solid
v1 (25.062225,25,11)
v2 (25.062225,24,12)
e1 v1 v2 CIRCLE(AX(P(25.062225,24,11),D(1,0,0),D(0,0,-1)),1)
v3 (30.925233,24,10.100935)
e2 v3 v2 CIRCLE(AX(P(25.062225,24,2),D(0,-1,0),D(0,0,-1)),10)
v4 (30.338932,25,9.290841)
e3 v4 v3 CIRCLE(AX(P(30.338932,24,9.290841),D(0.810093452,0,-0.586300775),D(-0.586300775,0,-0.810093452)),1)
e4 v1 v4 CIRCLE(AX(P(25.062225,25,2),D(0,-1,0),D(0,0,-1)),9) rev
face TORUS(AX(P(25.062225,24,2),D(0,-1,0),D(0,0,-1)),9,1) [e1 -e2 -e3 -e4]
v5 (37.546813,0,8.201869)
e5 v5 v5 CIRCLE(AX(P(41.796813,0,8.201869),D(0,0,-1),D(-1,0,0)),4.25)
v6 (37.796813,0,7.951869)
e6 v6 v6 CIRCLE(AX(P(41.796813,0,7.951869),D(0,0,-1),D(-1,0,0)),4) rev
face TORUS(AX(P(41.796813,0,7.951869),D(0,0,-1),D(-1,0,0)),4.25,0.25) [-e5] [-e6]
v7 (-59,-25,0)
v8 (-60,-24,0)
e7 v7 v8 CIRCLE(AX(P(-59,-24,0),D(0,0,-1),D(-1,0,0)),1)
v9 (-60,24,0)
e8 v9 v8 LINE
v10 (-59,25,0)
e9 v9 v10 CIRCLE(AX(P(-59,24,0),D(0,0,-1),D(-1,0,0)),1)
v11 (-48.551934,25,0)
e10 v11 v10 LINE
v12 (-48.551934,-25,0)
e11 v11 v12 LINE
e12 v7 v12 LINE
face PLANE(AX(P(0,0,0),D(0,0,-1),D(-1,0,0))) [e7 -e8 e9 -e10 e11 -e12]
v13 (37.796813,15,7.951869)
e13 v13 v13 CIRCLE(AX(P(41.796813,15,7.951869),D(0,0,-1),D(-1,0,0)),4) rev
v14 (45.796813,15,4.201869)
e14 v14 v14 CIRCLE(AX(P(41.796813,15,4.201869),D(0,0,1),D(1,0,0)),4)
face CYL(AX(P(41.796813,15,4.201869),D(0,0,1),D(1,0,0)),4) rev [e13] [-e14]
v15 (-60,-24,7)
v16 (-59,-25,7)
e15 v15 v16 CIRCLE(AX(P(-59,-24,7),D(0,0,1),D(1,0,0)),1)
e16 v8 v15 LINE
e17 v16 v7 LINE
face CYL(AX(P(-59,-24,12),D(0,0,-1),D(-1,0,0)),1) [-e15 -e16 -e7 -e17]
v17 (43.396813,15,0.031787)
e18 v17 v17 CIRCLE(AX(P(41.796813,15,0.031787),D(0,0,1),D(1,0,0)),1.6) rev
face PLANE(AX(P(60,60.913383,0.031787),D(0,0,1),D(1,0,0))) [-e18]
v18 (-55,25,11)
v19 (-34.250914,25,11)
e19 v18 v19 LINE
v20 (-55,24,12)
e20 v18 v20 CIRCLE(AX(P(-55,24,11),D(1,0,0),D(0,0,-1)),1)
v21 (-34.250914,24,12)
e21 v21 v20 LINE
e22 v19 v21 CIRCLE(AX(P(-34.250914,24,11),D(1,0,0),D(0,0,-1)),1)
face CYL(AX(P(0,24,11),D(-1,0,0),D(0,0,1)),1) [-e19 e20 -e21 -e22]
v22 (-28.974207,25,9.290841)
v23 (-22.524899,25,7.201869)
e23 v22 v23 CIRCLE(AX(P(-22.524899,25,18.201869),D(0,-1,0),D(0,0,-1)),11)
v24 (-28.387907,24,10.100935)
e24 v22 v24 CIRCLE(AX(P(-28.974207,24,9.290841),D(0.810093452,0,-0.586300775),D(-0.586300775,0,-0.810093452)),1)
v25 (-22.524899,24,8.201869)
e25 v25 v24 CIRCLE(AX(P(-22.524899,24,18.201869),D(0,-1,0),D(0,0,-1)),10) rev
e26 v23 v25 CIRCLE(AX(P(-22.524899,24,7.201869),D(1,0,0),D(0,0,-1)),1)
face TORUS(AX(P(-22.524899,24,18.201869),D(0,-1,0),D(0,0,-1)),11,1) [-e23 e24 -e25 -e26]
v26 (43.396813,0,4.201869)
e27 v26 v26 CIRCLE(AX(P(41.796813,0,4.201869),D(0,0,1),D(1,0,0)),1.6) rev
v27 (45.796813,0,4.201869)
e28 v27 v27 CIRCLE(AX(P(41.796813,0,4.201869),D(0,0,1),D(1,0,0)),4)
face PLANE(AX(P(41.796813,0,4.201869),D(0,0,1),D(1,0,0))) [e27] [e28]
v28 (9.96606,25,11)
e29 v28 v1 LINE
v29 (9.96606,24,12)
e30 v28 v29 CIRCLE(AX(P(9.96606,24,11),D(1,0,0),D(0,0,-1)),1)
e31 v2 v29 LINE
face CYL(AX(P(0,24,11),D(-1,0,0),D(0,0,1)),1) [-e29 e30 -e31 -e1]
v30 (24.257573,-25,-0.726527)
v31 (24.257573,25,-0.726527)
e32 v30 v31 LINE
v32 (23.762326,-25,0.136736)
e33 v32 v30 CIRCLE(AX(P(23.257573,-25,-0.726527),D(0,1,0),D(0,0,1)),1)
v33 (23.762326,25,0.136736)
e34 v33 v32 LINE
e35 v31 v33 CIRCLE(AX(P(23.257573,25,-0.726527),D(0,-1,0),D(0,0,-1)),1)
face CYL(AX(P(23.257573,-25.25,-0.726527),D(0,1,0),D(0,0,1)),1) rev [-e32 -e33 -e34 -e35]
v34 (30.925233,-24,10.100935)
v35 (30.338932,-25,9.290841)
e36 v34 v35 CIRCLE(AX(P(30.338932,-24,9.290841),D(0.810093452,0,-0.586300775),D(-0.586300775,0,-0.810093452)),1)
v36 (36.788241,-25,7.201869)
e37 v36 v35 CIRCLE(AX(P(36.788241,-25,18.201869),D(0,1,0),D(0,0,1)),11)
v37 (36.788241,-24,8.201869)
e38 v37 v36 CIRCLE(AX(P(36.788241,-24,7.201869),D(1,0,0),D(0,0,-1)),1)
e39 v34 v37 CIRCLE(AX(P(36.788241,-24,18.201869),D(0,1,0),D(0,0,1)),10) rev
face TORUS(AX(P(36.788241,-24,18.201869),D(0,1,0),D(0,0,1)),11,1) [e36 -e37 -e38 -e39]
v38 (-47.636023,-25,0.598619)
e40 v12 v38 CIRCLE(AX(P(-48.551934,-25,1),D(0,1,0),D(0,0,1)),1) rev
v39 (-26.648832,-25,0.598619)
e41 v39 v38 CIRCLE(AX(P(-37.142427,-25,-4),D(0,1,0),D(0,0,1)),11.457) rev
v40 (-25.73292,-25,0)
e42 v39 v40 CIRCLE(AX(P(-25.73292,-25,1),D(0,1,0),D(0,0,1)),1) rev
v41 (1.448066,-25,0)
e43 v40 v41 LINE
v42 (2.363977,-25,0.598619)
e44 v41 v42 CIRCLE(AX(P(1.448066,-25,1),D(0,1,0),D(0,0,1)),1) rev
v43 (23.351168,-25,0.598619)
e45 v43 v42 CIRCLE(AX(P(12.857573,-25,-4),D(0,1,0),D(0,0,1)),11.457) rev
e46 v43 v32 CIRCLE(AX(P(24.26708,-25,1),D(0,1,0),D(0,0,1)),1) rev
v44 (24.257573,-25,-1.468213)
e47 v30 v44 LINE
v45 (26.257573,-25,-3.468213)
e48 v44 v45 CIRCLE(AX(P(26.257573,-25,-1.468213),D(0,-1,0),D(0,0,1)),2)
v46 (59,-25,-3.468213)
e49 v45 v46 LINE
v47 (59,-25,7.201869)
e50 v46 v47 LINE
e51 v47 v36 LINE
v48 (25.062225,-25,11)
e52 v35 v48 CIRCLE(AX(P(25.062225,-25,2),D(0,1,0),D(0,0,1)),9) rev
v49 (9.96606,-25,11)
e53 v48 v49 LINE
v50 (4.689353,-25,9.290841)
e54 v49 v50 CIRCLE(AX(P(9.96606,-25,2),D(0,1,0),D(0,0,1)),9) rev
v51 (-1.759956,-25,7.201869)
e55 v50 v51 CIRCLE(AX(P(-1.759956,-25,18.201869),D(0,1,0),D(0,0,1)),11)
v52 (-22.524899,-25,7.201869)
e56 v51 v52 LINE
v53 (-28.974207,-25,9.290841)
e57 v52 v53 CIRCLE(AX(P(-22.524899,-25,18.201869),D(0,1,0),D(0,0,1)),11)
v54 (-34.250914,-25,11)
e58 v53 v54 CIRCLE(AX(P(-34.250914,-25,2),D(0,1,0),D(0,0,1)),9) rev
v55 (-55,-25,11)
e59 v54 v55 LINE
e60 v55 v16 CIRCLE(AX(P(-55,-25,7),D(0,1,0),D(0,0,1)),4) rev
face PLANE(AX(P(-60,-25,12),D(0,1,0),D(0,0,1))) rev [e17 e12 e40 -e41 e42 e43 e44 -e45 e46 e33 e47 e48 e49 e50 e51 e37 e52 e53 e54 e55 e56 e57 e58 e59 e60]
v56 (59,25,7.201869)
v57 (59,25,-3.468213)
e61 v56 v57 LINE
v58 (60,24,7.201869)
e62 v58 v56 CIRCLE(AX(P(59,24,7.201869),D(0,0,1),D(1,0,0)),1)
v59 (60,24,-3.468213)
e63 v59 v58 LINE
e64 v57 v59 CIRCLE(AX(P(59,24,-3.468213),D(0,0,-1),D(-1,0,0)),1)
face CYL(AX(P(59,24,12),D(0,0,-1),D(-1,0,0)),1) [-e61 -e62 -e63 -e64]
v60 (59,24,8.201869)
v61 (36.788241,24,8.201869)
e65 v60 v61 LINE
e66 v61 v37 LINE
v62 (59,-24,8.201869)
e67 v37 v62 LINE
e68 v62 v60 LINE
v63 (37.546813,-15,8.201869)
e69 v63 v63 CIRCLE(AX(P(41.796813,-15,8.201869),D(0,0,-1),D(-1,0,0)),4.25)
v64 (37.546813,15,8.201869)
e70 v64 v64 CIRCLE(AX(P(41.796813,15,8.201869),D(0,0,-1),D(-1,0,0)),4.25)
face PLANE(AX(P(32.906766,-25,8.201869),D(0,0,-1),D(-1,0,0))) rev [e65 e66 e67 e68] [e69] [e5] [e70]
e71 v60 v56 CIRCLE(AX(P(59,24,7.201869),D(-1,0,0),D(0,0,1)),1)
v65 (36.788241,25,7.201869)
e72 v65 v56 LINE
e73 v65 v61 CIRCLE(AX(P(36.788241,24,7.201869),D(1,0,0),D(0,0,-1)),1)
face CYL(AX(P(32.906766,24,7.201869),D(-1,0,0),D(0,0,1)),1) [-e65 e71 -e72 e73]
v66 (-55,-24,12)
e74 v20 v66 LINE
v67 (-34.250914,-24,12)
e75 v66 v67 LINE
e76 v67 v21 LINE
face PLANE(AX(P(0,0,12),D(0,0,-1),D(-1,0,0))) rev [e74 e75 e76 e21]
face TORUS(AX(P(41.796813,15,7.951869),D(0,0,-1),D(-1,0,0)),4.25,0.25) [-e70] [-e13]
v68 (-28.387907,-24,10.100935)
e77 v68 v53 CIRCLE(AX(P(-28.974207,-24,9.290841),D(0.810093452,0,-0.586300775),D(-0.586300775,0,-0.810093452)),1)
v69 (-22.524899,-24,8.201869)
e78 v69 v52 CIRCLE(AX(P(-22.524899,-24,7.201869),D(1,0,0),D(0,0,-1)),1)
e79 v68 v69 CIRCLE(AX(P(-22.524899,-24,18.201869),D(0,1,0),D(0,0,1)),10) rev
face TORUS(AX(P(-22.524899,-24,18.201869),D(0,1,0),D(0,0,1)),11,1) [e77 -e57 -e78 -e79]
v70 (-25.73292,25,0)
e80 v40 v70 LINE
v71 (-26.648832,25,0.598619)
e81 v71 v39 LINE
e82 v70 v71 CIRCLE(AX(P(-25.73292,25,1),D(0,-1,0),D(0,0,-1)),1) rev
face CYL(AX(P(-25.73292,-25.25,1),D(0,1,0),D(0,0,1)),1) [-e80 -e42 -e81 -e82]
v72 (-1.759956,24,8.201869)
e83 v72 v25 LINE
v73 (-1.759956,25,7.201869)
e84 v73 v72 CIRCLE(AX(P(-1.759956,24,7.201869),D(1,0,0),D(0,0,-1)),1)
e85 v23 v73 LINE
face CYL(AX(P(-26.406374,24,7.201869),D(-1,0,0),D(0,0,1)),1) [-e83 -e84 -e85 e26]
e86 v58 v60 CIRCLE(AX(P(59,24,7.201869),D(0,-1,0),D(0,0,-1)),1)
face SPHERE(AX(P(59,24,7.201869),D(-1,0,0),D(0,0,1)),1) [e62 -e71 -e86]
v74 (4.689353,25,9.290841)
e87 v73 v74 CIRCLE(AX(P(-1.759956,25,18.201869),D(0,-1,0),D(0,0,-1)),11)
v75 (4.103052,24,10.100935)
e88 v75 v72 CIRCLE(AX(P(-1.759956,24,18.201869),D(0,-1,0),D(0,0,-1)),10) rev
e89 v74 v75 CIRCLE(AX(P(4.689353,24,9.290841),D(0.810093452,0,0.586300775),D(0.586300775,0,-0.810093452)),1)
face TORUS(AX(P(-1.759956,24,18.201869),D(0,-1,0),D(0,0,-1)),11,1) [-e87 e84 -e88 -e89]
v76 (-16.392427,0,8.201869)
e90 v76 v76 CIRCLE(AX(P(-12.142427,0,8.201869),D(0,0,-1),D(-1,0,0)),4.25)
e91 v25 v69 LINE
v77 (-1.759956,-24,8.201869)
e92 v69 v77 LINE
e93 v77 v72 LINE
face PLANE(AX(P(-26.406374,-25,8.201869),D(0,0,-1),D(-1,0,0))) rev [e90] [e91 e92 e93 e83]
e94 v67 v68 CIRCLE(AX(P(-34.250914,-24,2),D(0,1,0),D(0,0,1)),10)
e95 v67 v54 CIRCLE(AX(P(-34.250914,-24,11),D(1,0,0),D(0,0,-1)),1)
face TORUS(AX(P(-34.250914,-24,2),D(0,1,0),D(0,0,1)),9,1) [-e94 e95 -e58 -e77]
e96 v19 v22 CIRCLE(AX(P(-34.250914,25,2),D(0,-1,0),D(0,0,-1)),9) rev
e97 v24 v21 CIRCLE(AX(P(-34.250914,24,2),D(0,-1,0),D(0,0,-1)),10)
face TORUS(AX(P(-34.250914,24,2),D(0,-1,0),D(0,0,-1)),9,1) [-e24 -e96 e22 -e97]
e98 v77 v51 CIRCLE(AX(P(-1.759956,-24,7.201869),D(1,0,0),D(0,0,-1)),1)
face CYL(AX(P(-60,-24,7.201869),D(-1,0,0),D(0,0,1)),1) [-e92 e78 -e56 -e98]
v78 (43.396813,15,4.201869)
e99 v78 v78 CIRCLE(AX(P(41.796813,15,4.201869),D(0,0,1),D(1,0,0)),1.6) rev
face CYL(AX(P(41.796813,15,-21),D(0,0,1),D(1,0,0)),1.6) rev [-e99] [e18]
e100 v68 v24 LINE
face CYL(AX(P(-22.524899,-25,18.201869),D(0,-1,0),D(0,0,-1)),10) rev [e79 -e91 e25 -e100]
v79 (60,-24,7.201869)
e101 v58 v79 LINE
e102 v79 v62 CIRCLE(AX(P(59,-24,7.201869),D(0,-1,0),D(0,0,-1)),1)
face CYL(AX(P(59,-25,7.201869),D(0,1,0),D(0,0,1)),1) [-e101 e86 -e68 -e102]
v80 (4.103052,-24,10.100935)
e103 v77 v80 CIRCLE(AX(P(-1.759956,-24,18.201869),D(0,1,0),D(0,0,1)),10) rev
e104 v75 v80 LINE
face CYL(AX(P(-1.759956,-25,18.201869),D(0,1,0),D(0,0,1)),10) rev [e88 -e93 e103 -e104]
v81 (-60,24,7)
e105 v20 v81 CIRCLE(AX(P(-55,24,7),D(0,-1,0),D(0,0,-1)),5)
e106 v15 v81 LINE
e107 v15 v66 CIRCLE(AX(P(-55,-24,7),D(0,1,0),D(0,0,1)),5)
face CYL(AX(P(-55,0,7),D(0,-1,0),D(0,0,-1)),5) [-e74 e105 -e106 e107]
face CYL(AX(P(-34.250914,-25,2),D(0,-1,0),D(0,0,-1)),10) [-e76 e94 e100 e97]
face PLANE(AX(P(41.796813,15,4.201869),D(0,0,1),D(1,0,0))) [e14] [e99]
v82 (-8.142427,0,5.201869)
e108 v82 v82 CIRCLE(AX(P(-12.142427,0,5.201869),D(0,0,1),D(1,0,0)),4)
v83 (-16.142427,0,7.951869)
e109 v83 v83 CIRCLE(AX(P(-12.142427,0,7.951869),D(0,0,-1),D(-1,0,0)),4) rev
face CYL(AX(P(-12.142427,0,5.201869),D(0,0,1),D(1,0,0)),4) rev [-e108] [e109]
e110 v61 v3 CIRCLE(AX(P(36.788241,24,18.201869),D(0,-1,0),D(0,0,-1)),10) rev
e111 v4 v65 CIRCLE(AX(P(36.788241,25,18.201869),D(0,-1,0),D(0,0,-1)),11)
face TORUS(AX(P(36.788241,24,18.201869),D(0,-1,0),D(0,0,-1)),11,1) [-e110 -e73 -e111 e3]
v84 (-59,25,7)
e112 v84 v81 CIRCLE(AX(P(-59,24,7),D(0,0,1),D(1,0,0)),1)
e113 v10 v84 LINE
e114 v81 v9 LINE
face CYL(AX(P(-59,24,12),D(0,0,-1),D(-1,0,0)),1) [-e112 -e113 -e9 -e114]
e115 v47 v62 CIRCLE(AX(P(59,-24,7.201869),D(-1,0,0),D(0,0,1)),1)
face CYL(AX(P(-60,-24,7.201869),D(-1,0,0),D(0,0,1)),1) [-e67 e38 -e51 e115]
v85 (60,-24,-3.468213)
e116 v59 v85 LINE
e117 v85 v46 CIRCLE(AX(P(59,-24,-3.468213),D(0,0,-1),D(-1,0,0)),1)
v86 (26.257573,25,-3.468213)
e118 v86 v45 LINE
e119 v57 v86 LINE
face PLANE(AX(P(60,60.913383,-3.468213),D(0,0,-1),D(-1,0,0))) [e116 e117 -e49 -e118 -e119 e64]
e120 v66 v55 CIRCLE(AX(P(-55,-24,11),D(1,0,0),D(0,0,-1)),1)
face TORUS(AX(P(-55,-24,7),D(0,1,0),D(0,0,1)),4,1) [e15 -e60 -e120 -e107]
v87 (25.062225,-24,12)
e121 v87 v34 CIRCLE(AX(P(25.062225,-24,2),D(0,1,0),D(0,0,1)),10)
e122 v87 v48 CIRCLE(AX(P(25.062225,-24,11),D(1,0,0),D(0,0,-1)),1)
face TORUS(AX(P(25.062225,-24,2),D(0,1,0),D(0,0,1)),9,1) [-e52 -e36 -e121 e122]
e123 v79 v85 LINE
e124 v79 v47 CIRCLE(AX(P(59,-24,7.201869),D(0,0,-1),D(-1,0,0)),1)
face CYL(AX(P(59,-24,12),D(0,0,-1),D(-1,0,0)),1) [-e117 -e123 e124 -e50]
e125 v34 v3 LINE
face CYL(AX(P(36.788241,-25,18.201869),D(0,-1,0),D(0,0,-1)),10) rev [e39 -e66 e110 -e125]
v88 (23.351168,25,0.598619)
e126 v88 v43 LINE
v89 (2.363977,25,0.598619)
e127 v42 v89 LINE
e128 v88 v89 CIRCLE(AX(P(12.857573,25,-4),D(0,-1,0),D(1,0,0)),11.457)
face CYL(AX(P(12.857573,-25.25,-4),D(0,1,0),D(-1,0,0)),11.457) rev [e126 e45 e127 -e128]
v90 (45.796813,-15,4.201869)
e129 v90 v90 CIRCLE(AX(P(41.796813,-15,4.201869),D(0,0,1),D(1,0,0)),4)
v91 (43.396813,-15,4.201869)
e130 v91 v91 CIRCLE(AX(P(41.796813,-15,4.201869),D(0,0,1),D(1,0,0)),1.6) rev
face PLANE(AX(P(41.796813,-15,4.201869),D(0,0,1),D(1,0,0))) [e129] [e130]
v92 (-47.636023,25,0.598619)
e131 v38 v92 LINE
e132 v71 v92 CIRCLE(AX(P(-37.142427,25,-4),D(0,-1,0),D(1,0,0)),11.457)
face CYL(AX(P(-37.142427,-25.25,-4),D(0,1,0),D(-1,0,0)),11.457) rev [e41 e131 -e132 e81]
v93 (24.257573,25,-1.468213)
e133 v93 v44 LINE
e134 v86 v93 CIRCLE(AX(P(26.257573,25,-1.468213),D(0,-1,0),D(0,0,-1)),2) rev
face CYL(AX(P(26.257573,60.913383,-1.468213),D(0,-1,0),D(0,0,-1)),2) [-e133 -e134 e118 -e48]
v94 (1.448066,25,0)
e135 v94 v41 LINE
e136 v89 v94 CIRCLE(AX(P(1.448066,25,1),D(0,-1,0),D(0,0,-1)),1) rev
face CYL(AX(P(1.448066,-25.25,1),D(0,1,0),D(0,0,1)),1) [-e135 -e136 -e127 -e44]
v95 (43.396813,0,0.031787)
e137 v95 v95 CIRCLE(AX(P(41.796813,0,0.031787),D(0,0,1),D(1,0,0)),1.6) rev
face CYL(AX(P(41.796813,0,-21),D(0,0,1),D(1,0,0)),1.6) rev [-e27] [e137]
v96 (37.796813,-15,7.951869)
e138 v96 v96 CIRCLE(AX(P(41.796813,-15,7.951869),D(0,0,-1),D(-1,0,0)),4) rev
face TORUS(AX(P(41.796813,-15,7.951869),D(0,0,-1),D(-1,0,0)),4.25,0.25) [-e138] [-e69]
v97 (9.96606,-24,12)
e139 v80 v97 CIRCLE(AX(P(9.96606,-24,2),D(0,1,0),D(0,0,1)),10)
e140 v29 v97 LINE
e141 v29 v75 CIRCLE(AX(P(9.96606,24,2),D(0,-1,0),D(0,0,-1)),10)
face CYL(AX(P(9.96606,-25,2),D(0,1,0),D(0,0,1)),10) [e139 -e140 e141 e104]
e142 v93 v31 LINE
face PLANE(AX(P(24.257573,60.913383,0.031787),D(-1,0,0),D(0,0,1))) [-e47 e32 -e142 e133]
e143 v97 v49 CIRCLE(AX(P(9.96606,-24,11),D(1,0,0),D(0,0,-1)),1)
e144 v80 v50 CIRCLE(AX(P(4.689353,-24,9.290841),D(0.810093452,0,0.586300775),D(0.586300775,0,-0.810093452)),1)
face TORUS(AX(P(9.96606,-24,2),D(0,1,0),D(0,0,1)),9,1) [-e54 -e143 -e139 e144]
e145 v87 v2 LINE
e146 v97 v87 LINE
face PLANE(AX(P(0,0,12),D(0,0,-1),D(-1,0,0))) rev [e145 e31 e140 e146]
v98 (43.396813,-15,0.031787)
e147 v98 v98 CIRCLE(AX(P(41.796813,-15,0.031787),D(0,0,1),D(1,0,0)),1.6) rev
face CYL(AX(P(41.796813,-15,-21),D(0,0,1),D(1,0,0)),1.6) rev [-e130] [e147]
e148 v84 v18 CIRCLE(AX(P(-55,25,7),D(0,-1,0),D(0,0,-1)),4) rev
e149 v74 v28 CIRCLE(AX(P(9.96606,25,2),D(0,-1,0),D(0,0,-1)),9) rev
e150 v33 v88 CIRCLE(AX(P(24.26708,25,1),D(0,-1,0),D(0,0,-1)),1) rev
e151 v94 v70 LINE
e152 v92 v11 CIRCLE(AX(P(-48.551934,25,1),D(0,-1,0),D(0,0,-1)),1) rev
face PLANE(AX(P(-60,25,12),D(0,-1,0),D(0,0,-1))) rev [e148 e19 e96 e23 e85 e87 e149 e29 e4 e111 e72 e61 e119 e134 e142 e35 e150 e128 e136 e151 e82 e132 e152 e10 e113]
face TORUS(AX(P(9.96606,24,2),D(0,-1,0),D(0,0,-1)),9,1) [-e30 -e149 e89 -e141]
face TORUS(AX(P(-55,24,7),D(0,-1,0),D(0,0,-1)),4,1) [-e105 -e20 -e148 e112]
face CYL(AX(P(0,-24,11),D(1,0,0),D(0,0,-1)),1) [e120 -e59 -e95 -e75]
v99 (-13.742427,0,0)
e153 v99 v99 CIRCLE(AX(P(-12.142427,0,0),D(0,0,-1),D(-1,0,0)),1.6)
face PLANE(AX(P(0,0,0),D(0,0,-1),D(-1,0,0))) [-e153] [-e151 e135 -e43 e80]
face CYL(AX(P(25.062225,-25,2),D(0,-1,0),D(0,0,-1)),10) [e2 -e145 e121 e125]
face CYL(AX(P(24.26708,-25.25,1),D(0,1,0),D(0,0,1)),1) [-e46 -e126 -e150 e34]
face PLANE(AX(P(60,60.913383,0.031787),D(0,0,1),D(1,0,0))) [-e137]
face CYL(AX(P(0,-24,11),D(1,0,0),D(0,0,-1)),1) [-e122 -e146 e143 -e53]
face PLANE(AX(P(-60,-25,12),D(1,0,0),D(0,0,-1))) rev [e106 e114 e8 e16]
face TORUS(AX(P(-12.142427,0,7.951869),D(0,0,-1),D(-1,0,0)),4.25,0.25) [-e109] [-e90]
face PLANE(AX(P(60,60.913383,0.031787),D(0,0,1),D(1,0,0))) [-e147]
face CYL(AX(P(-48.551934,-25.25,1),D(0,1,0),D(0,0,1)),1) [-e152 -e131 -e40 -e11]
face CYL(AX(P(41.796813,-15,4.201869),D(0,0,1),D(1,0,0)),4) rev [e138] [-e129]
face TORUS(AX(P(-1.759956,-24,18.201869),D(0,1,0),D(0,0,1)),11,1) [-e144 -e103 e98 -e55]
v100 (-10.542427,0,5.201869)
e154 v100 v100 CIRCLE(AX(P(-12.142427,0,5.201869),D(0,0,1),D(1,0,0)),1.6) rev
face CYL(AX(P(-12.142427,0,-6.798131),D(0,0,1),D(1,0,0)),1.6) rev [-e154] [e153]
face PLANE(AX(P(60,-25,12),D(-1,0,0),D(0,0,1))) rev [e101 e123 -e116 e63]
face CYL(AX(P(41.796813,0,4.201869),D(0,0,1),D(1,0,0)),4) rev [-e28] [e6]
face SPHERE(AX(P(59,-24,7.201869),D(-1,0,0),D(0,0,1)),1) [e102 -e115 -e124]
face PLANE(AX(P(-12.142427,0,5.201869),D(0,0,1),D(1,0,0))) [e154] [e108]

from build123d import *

# Parameters (mm, degrees)
ESQUISSE1_W             = 120
ESQUISSE1_H             = 50
BOSS_EXTRU_1_DEPTH      = 12
EMPREINTE1_START        = -25
EMPREINTE1_DEPTH        = 50
ESQUISSE3_W             = 28.527892604
ESQUISSE3_H             = 3.798130957
ENL_V_MAT_EXTRU_4_DEPTH = 80.018985061
CONG_2_R                = 10
CONG_3_R                = 10
ESQUISSE4_R             = 1.6
ENL_V_MAT_EXTRU_5_DEPTH = 15
ESQUISSE5_R             = 4
ENL_V_MAT_EXTRU_6_DEPTH = 3
CONG_4_R                = 0.25
CONG_5_R                = 5
ESQUISSE7_R             = 1.6
ENL_V_MAT_EXTRU_7_DEPTH = 33
ESQUISSE8_W             = 27.093233952
ESQUISSE8_H             = 3.798130957
ENL_V_MAT_EXTRU_8_DEPTH = 80.018985061
CONG_6_R                = 10
CONG_7_R                = 10
ESQUISSE9_R             = 4
ENL_V_MAT_EXTRU_9_DEPTH = 4
CONG_8_R                = 0.25
CONG_9_R                = 1
CONG_10_R               = 1
BOSS_EXTRU_2_DEPTH      = 50
CONG_11_R               = 1
CONG_12_R               = 1


# Read off the part's stored shape, not the designer's step: Empreinte1
with BuildPart() as part:
    # Esquisse1 → Boss.-Extru.1 (new body)
    with BuildSketch(Plane.XY):
        Rectangle(ESQUISSE1_W, ESQUISSE1_H)
    extrude(amount=BOSS_EXTRU_1_DEPTH)

    # Empreinte1 outline → Empreinte1 (cut)
    with BuildSketch(Plane(origin=(0, 0, 0), x_dir=(1, 0, 0), z_dir=(0, 1, 0)).offset(EMPREINTE1_START)):
        with BuildLine():
            Line((-26.406373523, 0), (-47.878480919, 0))
            ThreePointArc((-47.878480919, 0), (-37.142427221, -7.457), (-26.406373523, 0))
        make_face()
        with BuildLine():
            Line((23.593626477, 0), (2.121519081, 0))
            ThreePointArc((2.121519081, 0), (12.857572779, -7.457), (23.593626477, 0))
        make_face()
    extrude(amount=EMPREINTE1_DEPTH, mode=Mode.SUBTRACT)

    # Esquisse3 → Enlèv. mat.-Extru.4 (cut, through all)
    with BuildSketch(Plane(origin=(0, 25, 0), x_dir=(1, 0, 0), z_dir=(0, 1, 0))):
        with Locations((-12.142427221, -10.100934522)):
            Rectangle(ESQUISSE3_W, ESQUISSE3_H)
    extrude(amount=-ENL_V_MAT_EXTRU_4_DEPTH, mode=Mode.SUBTRACT)

    # Congé2
    # the kernel refuses this fillet: 10 mm, written as the material it takes off along each edge
    with BuildSketch(Plane(origin=(-26.406373523, 44.611352002, 12), x_dir=(0, 0, -1), z_dir=(0, -1, 0))) as cong_2_piece_1:
        with BuildLine():
            CenterArc((10, -7.844540801), CONG_2_R, 128.329784501, 51.670215499)
            Line((0, -7.844540801), (-0.2, -7.844540801))
            Line((-0.2, -7.844540801), (-0.2, 0))
            Line((-0.2, 0), (0, 0.2))
            ThreePointArc((0, 0.2), (1.899065478, 0.2), (3.674093576, 0.156890816))
            Line((3.674093576, 0.156890816), (3.798130957, 0))
        make_face()
    extrude(amount=89.222704003, mode=Mode.SUBTRACT)
    with BuildSketch(Plane(origin=(2.121519081, 44.611352002, 12), x_dir=(1, 0, 0), z_dir=(0, -1, 0))) as cong_2_piece_2:
        with BuildLine():
            CenterArc((7.844540801, -10), CONG_2_R, 90, 51.670215499)
            Line((0, -3.798130957), (-0.156890816, -3.674093576))
            ThreePointArc((-0.156890816, -3.674093576), (-0.2, -1.899065478), (-0.2, 0))
            Line((-0.2, 0), (0, 0.2))
            Line((0, 0.2), (7.844540801, 0.2))
            Line((7.844540801, 0.2), (7.844540801, 0))
        make_face()
    extrude(amount=89.222704003, mode=Mode.SUBTRACT)

    # Congé3
    cong_3_edges = [part.edges().sort_by_distance(p)[0] for p in [
        (2.121519081, 0, 8.201869043),
        (-26.406373523, 0, 8.201869043),
    ]]
    fillet(cong_3_edges, radius=CONG_3_R)

    # Esquisse4 → Enlèv. mat.-Extru.5 (cut)
    with BuildSketch(Plane.XY.offset(8.201869043)):
        with Locations((-12.142427221, 0)):
            Circle(ESQUISSE4_R)
    extrude(amount=-ENL_V_MAT_EXTRU_5_DEPTH, mode=Mode.SUBTRACT)

    # Esquisse5 → Enlèv. mat.-Extru.6 (cut)
    with BuildSketch(Plane.XY.offset(8.201869043)):
        with Locations((-12.142427221, 0)):
            Circle(ESQUISSE5_R)
    extrude(amount=-ENL_V_MAT_EXTRU_6_DEPTH, mode=Mode.SUBTRACT)

    # Congé4
    cong_4_edges = [part.edges().sort_by_distance(p)[0] for p in [
        (-16.142427221, 0, 8.201869043),
    ]]
    fillet(cong_4_edges, radius=CONG_4_R)

    # Congé5
    cong_5_edges = [part.edges().sort_by_distance(p)[0] for p in [
        (-60, 0, 12),
    ]]
    fillet(cong_5_edges, radius=CONG_5_R)

    # Esquisse7 → Enlèv. mat.-Extru.7 (cut)
    with BuildSketch(Plane.XY.offset(12)):
        with Locations((41.796813238, 0)):
            Circle(ESQUISSE7_R)
        with Locations((41.796813238, 15)):
            Circle(ESQUISSE7_R)
        with Locations((41.796813238, -15)):
            Circle(ESQUISSE7_R)
    extrude(amount=-ENL_V_MAT_EXTRU_7_DEPTH, mode=Mode.SUBTRACT)

    # Esquisse8 → Enlèv. mat.-Extru.8 (cut, through all)
    with BuildSketch(Plane(origin=(0, 25, 0), x_dir=(1, 0, 0), z_dir=(0, 1, 0))):
        with Locations((46.453383024, -10.100934522)):
            Rectangle(ESQUISSE8_W, ESQUISSE8_H)
    extrude(amount=-ENL_V_MAT_EXTRU_8_DEPTH, mode=Mode.SUBTRACT)

    # Congé6
    # the kernel refuses this fillet: 10 mm, written as the material it takes off along each edge
    with BuildSketch(Plane(origin=(32.906766048, 44.611352002, 12), x_dir=(-1, 0, 0), z_dir=(0, -1, 0))) as cong_6_piece_1:
        with BuildLine():
            CenterArc((7.844540801, 10), CONG_6_R, 218.329784501, 51.670215499)
            Line((0, 3.798130957), (-0.156890816, 3.674093576))
            ThreePointArc((-0.156890816, 3.674093576), (-0.2, 1.899065478), (-0.2, 0))
            Line((-0.2, 0), (0, -0.2))
            Line((0, -0.2), (7.844540801, -0.2))
            Line((7.844540801, -0.2), (7.844540801, 0))
        make_face()
    extrude(amount=89.222704003, mode=Mode.SUBTRACT)

    # Congé7
    cong_7_edges = [part.edges().sort_by_distance(p)[0] for p in [
        (32.906766048, 0, 8.201869043),
    ]]
    fillet(cong_7_edges, radius=CONG_7_R)

    # Esquisse9 → Enlèv. mat.-Extru.9 (cut)
    with BuildSketch(Plane.XY.offset(8.201869043)):
        with Locations((41.796813238, 15)):
            Circle(ESQUISSE9_R)
        with Locations((41.796813238, 0)):
            Circle(ESQUISSE9_R)
        with Locations((41.796813238, -15)):
            Circle(ESQUISSE9_R)
    extrude(amount=-ENL_V_MAT_EXTRU_9_DEPTH, mode=Mode.SUBTRACT)

    # Congé8
    cong_8_edges = [part.edges().sort_by_distance(p)[0] for p in [
        (37.796813238, 15, 8.201869043),
        (37.796813238, 0, 8.201869043),
        (37.796813238, -15, 8.201869043),
    ]]
    fillet(cong_8_edges, radius=CONG_8_R)

    # Congé9
    cong_9_edges = [part.edges().sort_by_distance(p)[0] for p in [
        (48.394120374, -25, 8.201869043),
        (48.394120374, 25, 8.201869043),
        (17.514142565, 25, 12),
        (28.143674159, 25, 11.513394379),
        (28.143674159, -25, 11.513394379),
        (33.706791837, 25, 8.688474664),
        (33.706791837, -25, 8.688474664),
        (-44.625457162, 25, 12),
        (-31.169465413, 25, 11.513394379),
        (17.514142565, -25, 12),
        (6.884610971, -25, 11.513394379),
        (-31.169465413, -25, 11.513394379),
        (-12.142427221, 25, 8.201869043),
        (-12.142427221, -25, 8.201869043),
        (6.884610971, 25, 11.513394379),
        (-25.606347735, 25, 8.688474664),
        (-25.606347735, -25, 8.688474664),
        (1.321493293, 25, 8.688474664),
        (1.321493293, -25, 8.688474664),
        (-44.625457162, -25, 12),
        (-60, -25, 3.5),
        (-58.535533906, -25, 10.535533906),
        (-60, 25, 3.5),
        (-58.535533906, 25, 10.535533906),
    ]]
    fillet(cong_9_edges, radius=CONG_9_R)

    # Congé10
    cong_10_edges = [part.edges().sort_by_distance(p)[0] for p in [
        (-26.406373523, 0, 0),
        (-47.878480919, 0, 0),
        (23.593626477, 0, 0),
        (2.121519081, 0, 0),
    ]]
    fillet(cong_10_edges, radius=CONG_10_R)

    # Esquisse10 → Boss.-Extru.2 (add)
    with BuildSketch(Plane.XZ.offset(25)):
        with BuildLine():
            Line((60, 0.031786633), (24.257572779, 0.031786633))
            Line((24.257572779, 0.031786633), (24.257572779, -1.468213367))
            ThreePointArc((24.257572779, -1.468213367), (24.843359217, -2.882426929), (26.257572779, -3.468213367))
            Line((26.257572779, -3.468213367), (60, -3.468213367))
            Line((60, -3.468213367), (60, 0.031786633))
        make_face()
    extrude(amount=-BOSS_EXTRU_2_DEPTH)

    # Congé11
    cong_11_edges = [part.edges().sort_by_distance(p)[0] for p in [
        (24.257572779, 0, 4.5192e-05),
    ]]
    fillet(cong_11_edges, radius=CONG_11_R)

    # Congé12
    cong_12_edges = [part.edges().sort_by_distance(p)[0] for p in [
        (60, -25, 1.866827838),
        (60, 0, 8.201869043),
        (60, 25, 1.866827838),
        (60, 24.707106781, 7.908975824),
        (60, -24.707106781, 7.908975824),
    ]]
    fillet(cong_12_edges, radius=CONG_12_R)


solid = part.part
